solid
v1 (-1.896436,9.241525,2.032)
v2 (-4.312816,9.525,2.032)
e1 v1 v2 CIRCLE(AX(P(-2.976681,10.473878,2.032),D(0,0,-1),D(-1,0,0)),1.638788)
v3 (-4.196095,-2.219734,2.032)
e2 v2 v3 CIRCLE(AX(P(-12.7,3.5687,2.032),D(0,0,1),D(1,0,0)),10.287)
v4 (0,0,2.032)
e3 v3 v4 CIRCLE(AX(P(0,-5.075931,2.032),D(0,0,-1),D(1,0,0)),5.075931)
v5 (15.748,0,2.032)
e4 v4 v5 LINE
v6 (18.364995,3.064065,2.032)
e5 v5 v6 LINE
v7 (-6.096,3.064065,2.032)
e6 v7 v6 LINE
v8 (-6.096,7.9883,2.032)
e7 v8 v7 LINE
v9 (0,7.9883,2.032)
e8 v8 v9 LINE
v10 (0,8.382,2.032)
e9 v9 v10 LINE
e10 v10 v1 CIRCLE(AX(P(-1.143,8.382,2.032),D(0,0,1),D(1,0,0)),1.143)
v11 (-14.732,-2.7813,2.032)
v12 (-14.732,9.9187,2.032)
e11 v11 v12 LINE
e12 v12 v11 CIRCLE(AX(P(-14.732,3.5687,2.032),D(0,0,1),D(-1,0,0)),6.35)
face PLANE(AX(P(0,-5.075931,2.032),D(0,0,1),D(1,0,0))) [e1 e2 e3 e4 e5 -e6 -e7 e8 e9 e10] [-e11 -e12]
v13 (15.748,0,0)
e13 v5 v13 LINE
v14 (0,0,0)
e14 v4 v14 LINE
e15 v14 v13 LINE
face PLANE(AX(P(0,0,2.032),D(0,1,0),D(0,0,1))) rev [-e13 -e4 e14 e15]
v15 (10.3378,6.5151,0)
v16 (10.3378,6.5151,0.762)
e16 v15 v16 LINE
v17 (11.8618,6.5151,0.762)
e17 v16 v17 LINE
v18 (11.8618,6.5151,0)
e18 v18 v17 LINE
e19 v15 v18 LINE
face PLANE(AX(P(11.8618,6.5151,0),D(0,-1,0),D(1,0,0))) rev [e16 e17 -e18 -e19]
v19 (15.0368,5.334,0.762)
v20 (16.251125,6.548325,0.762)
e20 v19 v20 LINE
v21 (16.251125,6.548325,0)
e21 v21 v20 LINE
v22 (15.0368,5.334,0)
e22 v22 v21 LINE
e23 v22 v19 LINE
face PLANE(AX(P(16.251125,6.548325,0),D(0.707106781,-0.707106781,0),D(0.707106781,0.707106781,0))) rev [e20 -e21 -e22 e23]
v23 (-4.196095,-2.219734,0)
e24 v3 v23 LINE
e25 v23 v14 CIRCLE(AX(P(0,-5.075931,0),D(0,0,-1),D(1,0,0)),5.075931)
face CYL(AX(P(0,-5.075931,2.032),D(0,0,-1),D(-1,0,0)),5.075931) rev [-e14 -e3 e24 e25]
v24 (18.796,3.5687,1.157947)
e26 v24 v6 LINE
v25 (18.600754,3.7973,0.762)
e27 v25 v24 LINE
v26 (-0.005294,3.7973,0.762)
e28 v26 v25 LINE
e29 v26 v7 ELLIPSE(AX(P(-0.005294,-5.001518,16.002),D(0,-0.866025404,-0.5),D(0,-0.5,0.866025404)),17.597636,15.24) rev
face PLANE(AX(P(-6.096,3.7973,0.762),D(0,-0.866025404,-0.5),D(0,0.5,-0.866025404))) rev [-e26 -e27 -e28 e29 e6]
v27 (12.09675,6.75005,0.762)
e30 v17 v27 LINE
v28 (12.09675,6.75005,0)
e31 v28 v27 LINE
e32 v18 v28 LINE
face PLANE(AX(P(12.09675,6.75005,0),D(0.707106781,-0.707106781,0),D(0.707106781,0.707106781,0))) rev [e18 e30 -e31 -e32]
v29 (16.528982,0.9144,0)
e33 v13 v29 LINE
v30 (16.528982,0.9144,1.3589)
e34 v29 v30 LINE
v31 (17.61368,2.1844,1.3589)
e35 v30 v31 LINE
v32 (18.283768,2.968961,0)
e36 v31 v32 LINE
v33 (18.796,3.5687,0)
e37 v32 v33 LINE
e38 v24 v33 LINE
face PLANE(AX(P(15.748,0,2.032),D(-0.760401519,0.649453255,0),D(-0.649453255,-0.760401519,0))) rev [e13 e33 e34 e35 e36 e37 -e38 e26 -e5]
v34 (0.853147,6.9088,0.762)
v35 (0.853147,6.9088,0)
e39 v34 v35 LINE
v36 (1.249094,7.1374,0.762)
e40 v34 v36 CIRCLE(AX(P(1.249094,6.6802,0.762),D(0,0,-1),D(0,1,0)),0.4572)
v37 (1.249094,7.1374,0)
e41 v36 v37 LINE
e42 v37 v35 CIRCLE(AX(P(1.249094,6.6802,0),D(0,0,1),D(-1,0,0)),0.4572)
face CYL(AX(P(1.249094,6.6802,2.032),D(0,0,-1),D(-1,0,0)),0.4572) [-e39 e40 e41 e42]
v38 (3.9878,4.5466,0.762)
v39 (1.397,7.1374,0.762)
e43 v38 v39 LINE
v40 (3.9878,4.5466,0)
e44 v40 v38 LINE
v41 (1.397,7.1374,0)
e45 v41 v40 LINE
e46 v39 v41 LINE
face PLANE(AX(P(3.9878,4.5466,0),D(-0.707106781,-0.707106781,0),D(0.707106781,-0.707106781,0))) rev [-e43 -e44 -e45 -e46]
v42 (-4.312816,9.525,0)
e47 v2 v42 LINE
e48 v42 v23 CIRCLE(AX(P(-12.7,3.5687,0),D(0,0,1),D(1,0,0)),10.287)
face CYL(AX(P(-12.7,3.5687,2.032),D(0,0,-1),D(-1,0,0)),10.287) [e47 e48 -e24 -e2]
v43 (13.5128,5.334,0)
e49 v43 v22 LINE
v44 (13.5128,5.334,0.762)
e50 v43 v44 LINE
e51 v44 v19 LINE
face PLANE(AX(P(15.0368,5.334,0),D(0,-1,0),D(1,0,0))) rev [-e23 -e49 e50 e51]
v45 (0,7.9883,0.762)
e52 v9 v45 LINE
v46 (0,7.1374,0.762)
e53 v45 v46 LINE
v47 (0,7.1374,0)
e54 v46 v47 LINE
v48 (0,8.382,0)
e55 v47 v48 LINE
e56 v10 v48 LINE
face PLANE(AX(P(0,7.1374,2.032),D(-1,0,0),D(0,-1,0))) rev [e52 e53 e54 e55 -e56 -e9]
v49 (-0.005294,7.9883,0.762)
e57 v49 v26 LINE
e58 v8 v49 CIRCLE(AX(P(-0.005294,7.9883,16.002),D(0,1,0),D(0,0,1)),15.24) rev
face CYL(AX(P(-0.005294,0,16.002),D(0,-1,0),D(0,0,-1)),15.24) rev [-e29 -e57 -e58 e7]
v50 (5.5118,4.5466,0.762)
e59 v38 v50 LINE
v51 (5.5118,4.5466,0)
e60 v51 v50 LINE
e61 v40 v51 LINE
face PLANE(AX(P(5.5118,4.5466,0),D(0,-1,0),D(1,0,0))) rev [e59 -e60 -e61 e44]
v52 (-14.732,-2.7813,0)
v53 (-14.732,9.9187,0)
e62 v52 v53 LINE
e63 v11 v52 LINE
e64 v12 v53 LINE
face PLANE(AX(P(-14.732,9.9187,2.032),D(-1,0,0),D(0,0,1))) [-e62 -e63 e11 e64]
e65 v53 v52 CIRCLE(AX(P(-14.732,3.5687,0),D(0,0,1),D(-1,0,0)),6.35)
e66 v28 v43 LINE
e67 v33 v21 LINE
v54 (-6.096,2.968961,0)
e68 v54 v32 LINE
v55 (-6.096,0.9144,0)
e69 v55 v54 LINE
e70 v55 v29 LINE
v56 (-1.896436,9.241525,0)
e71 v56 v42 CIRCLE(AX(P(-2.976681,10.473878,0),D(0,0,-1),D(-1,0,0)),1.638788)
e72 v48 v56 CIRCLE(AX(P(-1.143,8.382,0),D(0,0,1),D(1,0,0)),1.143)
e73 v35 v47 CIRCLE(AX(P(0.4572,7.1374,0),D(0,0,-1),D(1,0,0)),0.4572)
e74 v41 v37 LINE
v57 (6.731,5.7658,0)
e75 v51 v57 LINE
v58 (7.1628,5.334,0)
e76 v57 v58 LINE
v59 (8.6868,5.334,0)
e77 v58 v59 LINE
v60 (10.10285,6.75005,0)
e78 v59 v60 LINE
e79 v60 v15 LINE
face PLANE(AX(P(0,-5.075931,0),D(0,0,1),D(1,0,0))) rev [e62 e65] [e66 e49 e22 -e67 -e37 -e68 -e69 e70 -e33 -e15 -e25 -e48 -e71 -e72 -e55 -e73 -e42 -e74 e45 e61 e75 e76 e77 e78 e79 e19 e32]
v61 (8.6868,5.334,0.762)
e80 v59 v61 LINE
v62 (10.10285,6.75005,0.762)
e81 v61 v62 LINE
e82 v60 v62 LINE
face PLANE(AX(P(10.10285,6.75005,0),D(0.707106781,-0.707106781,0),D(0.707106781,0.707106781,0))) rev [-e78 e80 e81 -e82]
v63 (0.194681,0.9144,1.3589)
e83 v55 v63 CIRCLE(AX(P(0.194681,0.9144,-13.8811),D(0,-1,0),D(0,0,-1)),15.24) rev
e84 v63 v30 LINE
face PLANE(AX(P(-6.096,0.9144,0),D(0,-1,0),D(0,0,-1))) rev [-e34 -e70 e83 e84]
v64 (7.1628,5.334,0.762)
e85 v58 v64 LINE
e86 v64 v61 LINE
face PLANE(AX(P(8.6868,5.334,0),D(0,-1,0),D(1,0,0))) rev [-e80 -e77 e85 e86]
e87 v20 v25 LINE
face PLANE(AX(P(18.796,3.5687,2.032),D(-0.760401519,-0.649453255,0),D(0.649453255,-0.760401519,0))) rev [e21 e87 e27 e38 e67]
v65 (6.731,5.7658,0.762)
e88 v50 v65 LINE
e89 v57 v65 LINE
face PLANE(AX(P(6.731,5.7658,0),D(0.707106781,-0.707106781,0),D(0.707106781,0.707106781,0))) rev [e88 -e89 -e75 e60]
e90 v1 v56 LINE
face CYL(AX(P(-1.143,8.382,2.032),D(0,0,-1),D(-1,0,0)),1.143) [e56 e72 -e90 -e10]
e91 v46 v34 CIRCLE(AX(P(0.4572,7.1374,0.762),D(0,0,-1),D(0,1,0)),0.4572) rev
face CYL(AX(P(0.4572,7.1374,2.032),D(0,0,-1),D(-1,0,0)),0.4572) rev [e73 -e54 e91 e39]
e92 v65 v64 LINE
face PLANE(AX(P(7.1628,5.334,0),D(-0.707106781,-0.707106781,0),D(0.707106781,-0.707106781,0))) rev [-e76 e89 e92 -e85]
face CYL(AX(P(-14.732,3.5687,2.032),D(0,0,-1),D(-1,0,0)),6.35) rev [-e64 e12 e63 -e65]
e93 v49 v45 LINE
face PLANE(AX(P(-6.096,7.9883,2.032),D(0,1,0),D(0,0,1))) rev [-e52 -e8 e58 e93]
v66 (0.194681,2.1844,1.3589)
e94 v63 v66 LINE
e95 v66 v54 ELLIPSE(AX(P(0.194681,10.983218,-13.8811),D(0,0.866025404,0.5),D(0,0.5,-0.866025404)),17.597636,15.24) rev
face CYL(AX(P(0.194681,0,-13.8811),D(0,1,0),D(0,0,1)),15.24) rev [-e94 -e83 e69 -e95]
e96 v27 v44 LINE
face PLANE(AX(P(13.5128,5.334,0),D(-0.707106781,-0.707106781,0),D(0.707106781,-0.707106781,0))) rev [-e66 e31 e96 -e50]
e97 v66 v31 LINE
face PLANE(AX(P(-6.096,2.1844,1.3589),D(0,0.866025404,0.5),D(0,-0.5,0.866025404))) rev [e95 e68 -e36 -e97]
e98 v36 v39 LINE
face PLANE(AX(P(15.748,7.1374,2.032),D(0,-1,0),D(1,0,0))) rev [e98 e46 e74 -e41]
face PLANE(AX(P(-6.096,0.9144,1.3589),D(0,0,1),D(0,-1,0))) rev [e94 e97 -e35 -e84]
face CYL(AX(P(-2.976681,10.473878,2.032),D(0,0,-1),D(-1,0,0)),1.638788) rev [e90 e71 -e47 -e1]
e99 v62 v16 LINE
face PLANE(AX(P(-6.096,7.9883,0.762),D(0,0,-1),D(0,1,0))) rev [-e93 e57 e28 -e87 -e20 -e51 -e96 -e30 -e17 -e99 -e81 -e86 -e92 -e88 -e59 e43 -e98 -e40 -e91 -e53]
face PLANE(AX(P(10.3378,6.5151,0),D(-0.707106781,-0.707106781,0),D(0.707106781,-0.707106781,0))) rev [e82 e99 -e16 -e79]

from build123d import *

# Parameters (mm, degrees)
BOSS_EXTRUDE1_DEPTH = 2.032
CUT_EXTRUDE2_DEPTH  = 24.892
FILLET1_R           = 15.24
CUT_EXTRUDE3_DEPTH  = 27.869973793


with BuildPart() as part:
    # Sketch1 → Boss-Extrude1 (new body)
    with BuildSketch(Plane.XY):
        with BuildLine():
            Line((0, 0), (15.748, 0))
            Line((15.748, 0), (18.796, 3.5687))
            Line((18.796, 3.5687), (15.748, 7.1374))
            Line((15.748, 7.1374), (1.249093629, 7.1374))
            ThreePointArc((1.249093629, 7.1374), (1.020493629, 7.076146815), (0.853146815, 6.9088))
            ThreePointArc((0.853146815, 6.9088), (0.338867933, 6.695778712), (0, 7.1374))
            Line((0, 7.1374), (0, 8.382))
            ThreePointArc((0, 8.382), (-0.671156766, 9.42306338), (-1.896435629, 9.241525307))
            ThreePointArc((-1.896435629, 9.241525307), (-3.167624386, 8.846252494), (-4.312815757, 9.525))
            ThreePointArc((-4.312815757, 9.525), (-22.986492034, 3.466471629), (-4.196095201, -2.219734364))
            ThreePointArc((-4.196095201, -2.219734364), (-2.373522466, -0.589120746), (0, 0))
        make_face()
        with BuildLine():
            Line((-14.732, 9.9187), (-14.732, -2.7813))
            ThreePointArc((-14.732, -2.7813), (-21.082, 3.5687), (-14.732, 9.9187))
        make_face(mode=Mode.SUBTRACT)
    extrude(amount=BOSS_EXTRUDE1_DEPTH)

    # Sketch2 → Cut-Extrude2 (cut)
    with BuildSketch(Plane(origin=(18.796, 0, 0), x_dir=(0, 0, -1), z_dir=(1, 0, 0))):
        Polygon((0, 0.9144), (-1.3589, 0.9144), (-1.3589, 2.1844), (0, 2.968961281), align=None)
        Polygon((-0.762, 3.7973), (-2.032, 3.064065158), (-2.032, 7.9883), (-0.762, 7.9883), align=None)
    extrude(amount=-CUT_EXTRUDE2_DEPTH, mode=Mode.SUBTRACT)

    # Fillet1
    # the kernel refuses this fillet: 15.24 mm, written as the material it adds along each edge
    with BuildSketch(Plane(origin=(-6.096, 0.9144, 1.3589), x_dir=(0, 0, -1), z_dir=(0, 1, 0))) as fillet1_piece_1_section:
        with BuildLine():
            CenterArc((15.24, -6.29068063), FILLET1_R, 155.620767223, 24.379232777)
            Line((0, -6.29068063), (-0.3048, -6.29068063))
            Line((-0.3048, -6.29068063), (-0.3048, 0))
            Line((-0.3048, 0), (0, 0.3048))
            ThreePointArc((0, 0.3048), (0.67945, 0.3048), (1.081278, 0.125813613))
            Line((1.081278, 0.125813613), (1.3589, 0))
        make_face()
    fillet1_piece_1 = extrude(amount=16.996701575, mode=Mode.PRIVATE)
    fillet1_piece_1 = split(fillet1_piece_1, bisect_by=Plane(origin=(-4.21750285, 2.15532175, 1.409265006), z_dir=(0, -0.8660254037844416, -0.49999999999999506)), keep=Keep.TOP, mode=Mode.PRIVATE)
    add(fillet1_piece_1)
    with BuildSketch(Plane(origin=(-6.096, 7.9883, 0.762), x_dir=(0, 0, 1), z_dir=(0, -1, 0))) as fillet1_piece_2_section:
        with BuildLine():
            CenterArc((15.24, -6.090706035), FILLET1_R, 156.443535691, 23.556464309)
            Line((0, -6.090706035), (-0.3048, -6.090706035))
            Line((-0.3048, -6.090706035), (-0.3048, 0))
            Line((-0.3048, 0), (0, 0.3048))
            ThreePointArc((0, 0.3048), (0.635, 0.3048), (0.9906, 0.121814121))
            Line((0.9906, 0.121814121), (1.27, 0))
        make_face()
    fillet1_piece_2 = extrude(amount=19.417765087, mode=Mode.PRIVATE)
    fillet1_piece_2 = split(fillet1_piece_2, bisect_by=Plane(origin=(-4.154309829, 4.225398766, 0.020511187), z_dir=(0, 0.8660254037844416, 0.49999999999999506)), keep=Keep.TOP, mode=Mode.PRIVATE)
    add(fillet1_piece_2)

    # Sketch3 → Cut-Extrude3 (cut, through all)
    with BuildSketch(Plane.XY.offset(0.762)):
        Polygon((18.796, 7.9883), (18.796, 3.5687), (16.25112476, 6.54832476), (15.0368, 5.334), (13.5128, 5.334), (12.09675, 6.75005), (11.8618, 6.5151), (10.3378, 6.5151), (10.10285, 6.75005), (8.6868, 5.334), (7.1628, 5.334), (6.731, 5.7658), (5.5118, 4.5466), (3.9878, 4.5466), (0.5461, 7.9883), align=None)
    extrude(amount=-CUT_EXTRUDE3_DEPTH, mode=Mode.SUBTRACT)


solid = part.part
